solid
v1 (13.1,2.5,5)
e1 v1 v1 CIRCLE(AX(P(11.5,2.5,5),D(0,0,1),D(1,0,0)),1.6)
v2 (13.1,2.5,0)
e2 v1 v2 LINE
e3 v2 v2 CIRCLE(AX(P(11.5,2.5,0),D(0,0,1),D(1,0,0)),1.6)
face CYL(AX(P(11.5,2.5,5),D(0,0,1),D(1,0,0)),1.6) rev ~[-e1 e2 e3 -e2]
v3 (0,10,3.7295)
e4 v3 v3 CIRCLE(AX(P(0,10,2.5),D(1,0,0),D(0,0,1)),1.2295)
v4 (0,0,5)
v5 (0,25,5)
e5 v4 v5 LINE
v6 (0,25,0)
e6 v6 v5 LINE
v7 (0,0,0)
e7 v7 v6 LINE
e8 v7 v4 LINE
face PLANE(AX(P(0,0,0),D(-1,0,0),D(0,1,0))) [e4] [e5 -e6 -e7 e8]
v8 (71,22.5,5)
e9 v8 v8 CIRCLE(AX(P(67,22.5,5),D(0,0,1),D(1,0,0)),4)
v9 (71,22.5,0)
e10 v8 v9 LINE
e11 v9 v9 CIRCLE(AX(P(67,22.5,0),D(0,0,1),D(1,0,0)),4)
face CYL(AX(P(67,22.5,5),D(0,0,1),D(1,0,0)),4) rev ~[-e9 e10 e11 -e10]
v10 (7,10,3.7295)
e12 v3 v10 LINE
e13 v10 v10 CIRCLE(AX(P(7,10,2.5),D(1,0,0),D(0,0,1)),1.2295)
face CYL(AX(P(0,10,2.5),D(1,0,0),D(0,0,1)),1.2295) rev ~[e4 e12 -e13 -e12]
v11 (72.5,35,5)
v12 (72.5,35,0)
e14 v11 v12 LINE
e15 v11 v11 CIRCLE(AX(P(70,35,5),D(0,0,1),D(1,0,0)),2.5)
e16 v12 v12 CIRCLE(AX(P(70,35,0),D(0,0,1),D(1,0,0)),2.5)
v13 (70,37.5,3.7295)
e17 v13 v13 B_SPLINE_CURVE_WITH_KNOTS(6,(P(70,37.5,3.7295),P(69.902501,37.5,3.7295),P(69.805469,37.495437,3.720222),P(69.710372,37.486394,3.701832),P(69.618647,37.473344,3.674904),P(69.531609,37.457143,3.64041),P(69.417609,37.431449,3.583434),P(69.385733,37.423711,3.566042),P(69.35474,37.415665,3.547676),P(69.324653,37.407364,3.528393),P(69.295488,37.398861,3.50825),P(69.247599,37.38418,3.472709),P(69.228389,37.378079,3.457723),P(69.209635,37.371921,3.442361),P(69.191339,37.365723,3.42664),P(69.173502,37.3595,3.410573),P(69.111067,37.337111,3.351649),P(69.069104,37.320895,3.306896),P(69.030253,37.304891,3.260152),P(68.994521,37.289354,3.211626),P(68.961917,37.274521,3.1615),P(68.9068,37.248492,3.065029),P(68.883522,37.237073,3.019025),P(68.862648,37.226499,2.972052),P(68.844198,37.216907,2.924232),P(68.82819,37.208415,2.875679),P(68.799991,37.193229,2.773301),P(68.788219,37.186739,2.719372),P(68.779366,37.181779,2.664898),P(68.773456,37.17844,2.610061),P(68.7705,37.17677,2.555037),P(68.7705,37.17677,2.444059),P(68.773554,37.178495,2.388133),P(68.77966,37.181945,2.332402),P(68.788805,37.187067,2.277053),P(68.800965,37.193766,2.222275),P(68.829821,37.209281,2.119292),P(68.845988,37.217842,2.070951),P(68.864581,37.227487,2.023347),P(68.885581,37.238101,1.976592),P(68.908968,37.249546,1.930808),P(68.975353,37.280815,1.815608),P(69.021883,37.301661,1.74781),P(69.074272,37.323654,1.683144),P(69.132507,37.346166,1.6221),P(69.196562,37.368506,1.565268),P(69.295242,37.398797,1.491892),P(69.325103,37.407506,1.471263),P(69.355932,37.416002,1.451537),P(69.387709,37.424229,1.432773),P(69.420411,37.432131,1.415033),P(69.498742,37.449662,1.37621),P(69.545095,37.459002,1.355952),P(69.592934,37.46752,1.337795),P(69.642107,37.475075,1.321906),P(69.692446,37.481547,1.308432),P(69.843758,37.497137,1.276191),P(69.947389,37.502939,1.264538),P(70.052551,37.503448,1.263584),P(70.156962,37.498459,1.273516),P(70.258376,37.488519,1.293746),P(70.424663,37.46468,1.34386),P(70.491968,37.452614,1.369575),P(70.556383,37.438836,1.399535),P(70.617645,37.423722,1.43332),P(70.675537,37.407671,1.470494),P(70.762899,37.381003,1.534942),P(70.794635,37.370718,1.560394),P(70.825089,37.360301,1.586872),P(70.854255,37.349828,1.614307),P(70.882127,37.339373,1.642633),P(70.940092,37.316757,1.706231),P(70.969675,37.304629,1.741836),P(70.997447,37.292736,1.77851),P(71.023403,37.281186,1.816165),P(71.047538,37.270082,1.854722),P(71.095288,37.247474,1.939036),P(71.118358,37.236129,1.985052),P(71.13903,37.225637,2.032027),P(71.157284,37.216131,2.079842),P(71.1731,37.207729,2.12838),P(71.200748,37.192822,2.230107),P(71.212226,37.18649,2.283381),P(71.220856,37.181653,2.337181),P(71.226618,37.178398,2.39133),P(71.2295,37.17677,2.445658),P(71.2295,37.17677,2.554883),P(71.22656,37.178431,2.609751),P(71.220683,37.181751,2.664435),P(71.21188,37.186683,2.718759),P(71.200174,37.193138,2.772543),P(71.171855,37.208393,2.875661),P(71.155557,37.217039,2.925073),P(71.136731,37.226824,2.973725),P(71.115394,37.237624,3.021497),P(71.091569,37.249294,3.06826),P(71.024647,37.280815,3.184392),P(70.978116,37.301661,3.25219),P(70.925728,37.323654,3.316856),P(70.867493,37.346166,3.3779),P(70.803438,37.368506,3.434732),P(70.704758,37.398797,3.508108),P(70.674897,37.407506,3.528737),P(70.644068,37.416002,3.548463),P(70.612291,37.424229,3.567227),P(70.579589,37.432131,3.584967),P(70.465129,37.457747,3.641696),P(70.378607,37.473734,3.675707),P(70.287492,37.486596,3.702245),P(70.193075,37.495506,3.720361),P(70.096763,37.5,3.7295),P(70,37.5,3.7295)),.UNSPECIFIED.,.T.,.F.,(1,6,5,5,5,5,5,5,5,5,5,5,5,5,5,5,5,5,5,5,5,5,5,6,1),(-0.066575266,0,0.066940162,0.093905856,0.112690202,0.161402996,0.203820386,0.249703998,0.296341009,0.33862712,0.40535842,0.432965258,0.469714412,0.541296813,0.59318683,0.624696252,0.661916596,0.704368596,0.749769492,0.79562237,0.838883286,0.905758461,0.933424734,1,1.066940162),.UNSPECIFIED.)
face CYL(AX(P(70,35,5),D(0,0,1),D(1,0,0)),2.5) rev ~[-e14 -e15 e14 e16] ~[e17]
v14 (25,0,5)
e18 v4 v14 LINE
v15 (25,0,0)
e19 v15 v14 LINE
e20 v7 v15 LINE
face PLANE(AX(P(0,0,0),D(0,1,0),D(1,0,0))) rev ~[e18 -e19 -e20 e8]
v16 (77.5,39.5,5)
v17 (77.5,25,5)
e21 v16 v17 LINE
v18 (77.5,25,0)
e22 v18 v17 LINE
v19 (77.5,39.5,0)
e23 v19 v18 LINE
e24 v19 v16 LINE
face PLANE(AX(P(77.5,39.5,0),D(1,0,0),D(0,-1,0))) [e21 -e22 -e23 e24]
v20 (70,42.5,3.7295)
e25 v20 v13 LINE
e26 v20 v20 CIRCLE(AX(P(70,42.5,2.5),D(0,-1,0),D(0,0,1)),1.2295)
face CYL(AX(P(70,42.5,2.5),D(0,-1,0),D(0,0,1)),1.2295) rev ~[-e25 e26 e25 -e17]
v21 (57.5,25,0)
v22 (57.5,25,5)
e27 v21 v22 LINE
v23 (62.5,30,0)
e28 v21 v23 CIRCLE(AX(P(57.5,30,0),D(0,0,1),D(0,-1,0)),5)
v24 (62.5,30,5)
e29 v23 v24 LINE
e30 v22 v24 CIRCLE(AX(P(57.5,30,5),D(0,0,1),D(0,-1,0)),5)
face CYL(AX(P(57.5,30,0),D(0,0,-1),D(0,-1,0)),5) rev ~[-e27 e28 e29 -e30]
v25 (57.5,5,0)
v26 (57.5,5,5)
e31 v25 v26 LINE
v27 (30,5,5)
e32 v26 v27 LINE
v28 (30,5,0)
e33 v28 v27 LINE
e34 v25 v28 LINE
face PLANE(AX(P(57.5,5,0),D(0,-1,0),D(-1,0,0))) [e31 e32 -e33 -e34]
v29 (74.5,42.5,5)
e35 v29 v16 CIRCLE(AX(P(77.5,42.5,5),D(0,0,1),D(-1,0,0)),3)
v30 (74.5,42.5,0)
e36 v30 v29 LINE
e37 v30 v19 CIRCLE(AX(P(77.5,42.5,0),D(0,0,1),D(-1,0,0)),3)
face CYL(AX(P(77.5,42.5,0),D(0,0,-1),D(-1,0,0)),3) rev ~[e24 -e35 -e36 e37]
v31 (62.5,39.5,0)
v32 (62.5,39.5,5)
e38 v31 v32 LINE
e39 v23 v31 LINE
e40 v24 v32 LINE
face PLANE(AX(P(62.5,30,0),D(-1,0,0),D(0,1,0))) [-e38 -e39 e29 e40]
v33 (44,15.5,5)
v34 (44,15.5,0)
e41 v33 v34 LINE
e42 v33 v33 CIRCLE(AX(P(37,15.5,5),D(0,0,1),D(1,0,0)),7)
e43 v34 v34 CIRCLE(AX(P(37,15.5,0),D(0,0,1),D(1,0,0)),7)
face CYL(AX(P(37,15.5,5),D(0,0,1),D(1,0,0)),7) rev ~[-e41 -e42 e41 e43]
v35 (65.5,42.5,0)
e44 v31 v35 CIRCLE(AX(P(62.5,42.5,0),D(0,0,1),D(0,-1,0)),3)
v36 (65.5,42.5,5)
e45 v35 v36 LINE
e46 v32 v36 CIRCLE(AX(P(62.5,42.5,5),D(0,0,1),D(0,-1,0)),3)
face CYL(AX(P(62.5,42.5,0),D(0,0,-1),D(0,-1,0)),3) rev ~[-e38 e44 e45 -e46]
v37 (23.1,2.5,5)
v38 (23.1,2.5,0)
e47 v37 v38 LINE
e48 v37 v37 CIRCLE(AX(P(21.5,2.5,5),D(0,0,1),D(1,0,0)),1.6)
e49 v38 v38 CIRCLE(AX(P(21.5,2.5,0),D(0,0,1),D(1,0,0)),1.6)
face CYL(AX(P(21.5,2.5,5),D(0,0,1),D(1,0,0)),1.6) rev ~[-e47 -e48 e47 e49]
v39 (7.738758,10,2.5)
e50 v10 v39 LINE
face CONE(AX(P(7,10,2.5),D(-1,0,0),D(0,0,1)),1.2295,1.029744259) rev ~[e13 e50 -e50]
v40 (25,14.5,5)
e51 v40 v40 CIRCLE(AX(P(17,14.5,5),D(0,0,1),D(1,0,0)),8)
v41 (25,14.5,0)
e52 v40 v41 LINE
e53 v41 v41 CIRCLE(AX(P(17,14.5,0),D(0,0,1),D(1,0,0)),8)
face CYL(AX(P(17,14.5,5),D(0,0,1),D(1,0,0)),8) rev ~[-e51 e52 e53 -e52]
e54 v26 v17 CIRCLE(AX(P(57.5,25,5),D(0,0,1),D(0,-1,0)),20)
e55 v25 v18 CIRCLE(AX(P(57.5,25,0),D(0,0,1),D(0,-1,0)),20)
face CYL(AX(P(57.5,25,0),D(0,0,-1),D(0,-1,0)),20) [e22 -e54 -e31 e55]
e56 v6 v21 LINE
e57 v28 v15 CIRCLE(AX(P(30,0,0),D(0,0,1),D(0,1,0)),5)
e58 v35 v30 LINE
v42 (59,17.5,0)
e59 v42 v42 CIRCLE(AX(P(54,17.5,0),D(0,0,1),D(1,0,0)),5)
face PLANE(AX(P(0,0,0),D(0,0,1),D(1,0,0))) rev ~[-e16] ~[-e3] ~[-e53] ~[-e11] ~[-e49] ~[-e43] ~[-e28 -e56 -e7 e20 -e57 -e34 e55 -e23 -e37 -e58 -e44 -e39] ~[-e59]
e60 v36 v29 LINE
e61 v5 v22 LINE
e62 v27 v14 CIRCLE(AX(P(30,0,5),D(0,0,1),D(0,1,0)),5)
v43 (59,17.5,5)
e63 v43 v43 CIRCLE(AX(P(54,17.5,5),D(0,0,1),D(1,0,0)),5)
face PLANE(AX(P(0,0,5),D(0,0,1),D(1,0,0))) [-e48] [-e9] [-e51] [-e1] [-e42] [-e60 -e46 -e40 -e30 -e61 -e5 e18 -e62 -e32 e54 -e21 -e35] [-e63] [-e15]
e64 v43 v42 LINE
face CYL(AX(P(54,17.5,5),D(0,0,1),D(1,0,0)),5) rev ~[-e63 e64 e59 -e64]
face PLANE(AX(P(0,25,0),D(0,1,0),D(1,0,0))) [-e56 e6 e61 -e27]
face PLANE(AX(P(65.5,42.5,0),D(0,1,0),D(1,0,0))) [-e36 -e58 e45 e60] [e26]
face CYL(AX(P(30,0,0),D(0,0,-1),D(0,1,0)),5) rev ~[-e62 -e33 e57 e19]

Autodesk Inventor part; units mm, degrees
ref_plane "YZ Plane" through (0, 0, 0) normal (1, 0, 0) x (0, 1, 0)
ref_plane "XZ Plane" through (0, 0, 0) normal (0, 1, 0) x (-1, 0, 0)
ref_plane "XY Plane" through (0, 0, 0) normal (0, 0, 1) x (1, 0, 0)
sketch "Skizze1" plane through (0, 0, 0) normal (0, 0, 1) x (1, 0, 0)
  line L0 (-16.3284, 0) -> (97.9706, 0) projected
  line L1 (0, -8.5) -> (0, 51) projected
  line L2 (0, 0) -> (0, 25)
  line L3 (0, 25) -> (57.5, 25)
  line L4 (62.5, 30) -> (62.5, 39.5)
  line L5 (77.5, 39.5) -> (77.5, 25)
  line L6 (57.5, 5) -> (30, 5)
  line L7 (25, 0) -> (25, 0)
  arc A0 (57.5, 5) -> (77.5, 25) centre (57.5, 25) ccw
  arc A1 (57.5, 25) -> (62.5, 30) centre (57.5, 30) ccw
  arc A2 (30, 5) -> (25, 0) centre (30, 0) ccw
  arc A3 (62.5, 39.5) -> (65.5, 42.5) centre (62.5, 42.5) ccw
  arc A4 (74.5, 42.5) -> (77.5, 39.5) centre (77.5, 42.5) ccw
  line L8 (65.5, 42.5) -> (74.5, 42.5)
  point P0 (62.5, 25)
  point P1 (77.5, 5)
  point P2 (25, 5)
  dimension "d0" = 77.5
  dimension "d3" = 25
  dimension "d4" = 5
  dimension "d5" = 25
  dimension "d11" = 20
  dimension "d12" = 5
  dimension "d19" = 15
  dimension "d21" = 42.5
  dimension "d22" = 3
  dimension "d23" = 3
extrude "Grundkörper" add sketch "Skizze1" along normal blind 5
sketch "Skizze2" plane through (0, 0, 5) normal (0, 0, 1) x (1, 0, 0)
  line L0 (0, -8.5) -> (0, 51) projected
  line L1 (-15.5, 0) -> (93, 0) projected
  line L2 (30, 5) -> (57.5, 5) projected
  circle A0 centre (11.5, 2.5) radius 1.6
  circle A1 centre (17, 14.5) radius 8
  circle A2 centre (21.5, 2.5) radius 1.6
  circle A3 centre (37, 15.5) radius 7
  circle A4 centre (54, 17.5) radius 5
  circle A5 centre (67, 22.5) radius 4
  circle A6 centre (70, 35) radius 2.5
  point P0 (0, 0)
  dimension "d24" = 11.5
  dimension "d25" = 10
  dimension "d26" = 2.5
  dimension "d27" = 2.5
  dimension "d28" = 14.5
  dimension "d29" = 17
  dimension "d30" = 10.5
  dimension "d31" = 37
  dimension "d32" = 12.5
  dimension "d33" = 54
  dimension "d34" = 17.5
  dimension "d35" = 67
  dimension "d36" = 70
  dimension "d37" = 35
  dimension "d38" = 16
  dimension "d39" = 3.2
  dimension "d40" = 3.2
  dimension "d41" = 14
  dimension "d42" = 10
  dimension "d43" = 8
  dimension "d44" = 5
extrude "Extrusion2" cut sketch "Skizze2" against normal through all
sketch "Skizze3" plane through (0, 0, 0) normal (-1, 0, 0) x (0, 0, 1)
  line L0 (0, -8.5) -> (0, 51) projected
  line L1 (-1, 0) -> (6, 0) projected
  point P0 (0, 0)
  point P1 (2.5, 10)
  dimension "d47" = 10
  dimension "d48" = 2.5
hole "Bohrung1" at (0, 10, 2.5) direction (1, 0, 0) diameter 2.459 depth 7 tip angle 118 thread size "M3x0.5" class "6H" standard "ISO Metric profile"
sketch "Skizze4" plane through (65.5, 42.5, 0) normal (0, 1, 0) x (1, 0, 0)
  line L0 (-81, 0) -> (27.5, 0) projected
  line L1 (12, 0) -> (12, -5) projected
  point P0 (-65.5, 0)
  point P1 (4.5, -2.5)
  dimension "d56" = 7.5
  dimension "d57" = 2.5
hole "Bohrung2" at (70, 42.5, 2.5) direction (0, -1, 0) diameter 2.459 end up to surface thread size "M3x0.5" class "6H" standard "ISO Metric profile"
properties part number "Lagerarm"
